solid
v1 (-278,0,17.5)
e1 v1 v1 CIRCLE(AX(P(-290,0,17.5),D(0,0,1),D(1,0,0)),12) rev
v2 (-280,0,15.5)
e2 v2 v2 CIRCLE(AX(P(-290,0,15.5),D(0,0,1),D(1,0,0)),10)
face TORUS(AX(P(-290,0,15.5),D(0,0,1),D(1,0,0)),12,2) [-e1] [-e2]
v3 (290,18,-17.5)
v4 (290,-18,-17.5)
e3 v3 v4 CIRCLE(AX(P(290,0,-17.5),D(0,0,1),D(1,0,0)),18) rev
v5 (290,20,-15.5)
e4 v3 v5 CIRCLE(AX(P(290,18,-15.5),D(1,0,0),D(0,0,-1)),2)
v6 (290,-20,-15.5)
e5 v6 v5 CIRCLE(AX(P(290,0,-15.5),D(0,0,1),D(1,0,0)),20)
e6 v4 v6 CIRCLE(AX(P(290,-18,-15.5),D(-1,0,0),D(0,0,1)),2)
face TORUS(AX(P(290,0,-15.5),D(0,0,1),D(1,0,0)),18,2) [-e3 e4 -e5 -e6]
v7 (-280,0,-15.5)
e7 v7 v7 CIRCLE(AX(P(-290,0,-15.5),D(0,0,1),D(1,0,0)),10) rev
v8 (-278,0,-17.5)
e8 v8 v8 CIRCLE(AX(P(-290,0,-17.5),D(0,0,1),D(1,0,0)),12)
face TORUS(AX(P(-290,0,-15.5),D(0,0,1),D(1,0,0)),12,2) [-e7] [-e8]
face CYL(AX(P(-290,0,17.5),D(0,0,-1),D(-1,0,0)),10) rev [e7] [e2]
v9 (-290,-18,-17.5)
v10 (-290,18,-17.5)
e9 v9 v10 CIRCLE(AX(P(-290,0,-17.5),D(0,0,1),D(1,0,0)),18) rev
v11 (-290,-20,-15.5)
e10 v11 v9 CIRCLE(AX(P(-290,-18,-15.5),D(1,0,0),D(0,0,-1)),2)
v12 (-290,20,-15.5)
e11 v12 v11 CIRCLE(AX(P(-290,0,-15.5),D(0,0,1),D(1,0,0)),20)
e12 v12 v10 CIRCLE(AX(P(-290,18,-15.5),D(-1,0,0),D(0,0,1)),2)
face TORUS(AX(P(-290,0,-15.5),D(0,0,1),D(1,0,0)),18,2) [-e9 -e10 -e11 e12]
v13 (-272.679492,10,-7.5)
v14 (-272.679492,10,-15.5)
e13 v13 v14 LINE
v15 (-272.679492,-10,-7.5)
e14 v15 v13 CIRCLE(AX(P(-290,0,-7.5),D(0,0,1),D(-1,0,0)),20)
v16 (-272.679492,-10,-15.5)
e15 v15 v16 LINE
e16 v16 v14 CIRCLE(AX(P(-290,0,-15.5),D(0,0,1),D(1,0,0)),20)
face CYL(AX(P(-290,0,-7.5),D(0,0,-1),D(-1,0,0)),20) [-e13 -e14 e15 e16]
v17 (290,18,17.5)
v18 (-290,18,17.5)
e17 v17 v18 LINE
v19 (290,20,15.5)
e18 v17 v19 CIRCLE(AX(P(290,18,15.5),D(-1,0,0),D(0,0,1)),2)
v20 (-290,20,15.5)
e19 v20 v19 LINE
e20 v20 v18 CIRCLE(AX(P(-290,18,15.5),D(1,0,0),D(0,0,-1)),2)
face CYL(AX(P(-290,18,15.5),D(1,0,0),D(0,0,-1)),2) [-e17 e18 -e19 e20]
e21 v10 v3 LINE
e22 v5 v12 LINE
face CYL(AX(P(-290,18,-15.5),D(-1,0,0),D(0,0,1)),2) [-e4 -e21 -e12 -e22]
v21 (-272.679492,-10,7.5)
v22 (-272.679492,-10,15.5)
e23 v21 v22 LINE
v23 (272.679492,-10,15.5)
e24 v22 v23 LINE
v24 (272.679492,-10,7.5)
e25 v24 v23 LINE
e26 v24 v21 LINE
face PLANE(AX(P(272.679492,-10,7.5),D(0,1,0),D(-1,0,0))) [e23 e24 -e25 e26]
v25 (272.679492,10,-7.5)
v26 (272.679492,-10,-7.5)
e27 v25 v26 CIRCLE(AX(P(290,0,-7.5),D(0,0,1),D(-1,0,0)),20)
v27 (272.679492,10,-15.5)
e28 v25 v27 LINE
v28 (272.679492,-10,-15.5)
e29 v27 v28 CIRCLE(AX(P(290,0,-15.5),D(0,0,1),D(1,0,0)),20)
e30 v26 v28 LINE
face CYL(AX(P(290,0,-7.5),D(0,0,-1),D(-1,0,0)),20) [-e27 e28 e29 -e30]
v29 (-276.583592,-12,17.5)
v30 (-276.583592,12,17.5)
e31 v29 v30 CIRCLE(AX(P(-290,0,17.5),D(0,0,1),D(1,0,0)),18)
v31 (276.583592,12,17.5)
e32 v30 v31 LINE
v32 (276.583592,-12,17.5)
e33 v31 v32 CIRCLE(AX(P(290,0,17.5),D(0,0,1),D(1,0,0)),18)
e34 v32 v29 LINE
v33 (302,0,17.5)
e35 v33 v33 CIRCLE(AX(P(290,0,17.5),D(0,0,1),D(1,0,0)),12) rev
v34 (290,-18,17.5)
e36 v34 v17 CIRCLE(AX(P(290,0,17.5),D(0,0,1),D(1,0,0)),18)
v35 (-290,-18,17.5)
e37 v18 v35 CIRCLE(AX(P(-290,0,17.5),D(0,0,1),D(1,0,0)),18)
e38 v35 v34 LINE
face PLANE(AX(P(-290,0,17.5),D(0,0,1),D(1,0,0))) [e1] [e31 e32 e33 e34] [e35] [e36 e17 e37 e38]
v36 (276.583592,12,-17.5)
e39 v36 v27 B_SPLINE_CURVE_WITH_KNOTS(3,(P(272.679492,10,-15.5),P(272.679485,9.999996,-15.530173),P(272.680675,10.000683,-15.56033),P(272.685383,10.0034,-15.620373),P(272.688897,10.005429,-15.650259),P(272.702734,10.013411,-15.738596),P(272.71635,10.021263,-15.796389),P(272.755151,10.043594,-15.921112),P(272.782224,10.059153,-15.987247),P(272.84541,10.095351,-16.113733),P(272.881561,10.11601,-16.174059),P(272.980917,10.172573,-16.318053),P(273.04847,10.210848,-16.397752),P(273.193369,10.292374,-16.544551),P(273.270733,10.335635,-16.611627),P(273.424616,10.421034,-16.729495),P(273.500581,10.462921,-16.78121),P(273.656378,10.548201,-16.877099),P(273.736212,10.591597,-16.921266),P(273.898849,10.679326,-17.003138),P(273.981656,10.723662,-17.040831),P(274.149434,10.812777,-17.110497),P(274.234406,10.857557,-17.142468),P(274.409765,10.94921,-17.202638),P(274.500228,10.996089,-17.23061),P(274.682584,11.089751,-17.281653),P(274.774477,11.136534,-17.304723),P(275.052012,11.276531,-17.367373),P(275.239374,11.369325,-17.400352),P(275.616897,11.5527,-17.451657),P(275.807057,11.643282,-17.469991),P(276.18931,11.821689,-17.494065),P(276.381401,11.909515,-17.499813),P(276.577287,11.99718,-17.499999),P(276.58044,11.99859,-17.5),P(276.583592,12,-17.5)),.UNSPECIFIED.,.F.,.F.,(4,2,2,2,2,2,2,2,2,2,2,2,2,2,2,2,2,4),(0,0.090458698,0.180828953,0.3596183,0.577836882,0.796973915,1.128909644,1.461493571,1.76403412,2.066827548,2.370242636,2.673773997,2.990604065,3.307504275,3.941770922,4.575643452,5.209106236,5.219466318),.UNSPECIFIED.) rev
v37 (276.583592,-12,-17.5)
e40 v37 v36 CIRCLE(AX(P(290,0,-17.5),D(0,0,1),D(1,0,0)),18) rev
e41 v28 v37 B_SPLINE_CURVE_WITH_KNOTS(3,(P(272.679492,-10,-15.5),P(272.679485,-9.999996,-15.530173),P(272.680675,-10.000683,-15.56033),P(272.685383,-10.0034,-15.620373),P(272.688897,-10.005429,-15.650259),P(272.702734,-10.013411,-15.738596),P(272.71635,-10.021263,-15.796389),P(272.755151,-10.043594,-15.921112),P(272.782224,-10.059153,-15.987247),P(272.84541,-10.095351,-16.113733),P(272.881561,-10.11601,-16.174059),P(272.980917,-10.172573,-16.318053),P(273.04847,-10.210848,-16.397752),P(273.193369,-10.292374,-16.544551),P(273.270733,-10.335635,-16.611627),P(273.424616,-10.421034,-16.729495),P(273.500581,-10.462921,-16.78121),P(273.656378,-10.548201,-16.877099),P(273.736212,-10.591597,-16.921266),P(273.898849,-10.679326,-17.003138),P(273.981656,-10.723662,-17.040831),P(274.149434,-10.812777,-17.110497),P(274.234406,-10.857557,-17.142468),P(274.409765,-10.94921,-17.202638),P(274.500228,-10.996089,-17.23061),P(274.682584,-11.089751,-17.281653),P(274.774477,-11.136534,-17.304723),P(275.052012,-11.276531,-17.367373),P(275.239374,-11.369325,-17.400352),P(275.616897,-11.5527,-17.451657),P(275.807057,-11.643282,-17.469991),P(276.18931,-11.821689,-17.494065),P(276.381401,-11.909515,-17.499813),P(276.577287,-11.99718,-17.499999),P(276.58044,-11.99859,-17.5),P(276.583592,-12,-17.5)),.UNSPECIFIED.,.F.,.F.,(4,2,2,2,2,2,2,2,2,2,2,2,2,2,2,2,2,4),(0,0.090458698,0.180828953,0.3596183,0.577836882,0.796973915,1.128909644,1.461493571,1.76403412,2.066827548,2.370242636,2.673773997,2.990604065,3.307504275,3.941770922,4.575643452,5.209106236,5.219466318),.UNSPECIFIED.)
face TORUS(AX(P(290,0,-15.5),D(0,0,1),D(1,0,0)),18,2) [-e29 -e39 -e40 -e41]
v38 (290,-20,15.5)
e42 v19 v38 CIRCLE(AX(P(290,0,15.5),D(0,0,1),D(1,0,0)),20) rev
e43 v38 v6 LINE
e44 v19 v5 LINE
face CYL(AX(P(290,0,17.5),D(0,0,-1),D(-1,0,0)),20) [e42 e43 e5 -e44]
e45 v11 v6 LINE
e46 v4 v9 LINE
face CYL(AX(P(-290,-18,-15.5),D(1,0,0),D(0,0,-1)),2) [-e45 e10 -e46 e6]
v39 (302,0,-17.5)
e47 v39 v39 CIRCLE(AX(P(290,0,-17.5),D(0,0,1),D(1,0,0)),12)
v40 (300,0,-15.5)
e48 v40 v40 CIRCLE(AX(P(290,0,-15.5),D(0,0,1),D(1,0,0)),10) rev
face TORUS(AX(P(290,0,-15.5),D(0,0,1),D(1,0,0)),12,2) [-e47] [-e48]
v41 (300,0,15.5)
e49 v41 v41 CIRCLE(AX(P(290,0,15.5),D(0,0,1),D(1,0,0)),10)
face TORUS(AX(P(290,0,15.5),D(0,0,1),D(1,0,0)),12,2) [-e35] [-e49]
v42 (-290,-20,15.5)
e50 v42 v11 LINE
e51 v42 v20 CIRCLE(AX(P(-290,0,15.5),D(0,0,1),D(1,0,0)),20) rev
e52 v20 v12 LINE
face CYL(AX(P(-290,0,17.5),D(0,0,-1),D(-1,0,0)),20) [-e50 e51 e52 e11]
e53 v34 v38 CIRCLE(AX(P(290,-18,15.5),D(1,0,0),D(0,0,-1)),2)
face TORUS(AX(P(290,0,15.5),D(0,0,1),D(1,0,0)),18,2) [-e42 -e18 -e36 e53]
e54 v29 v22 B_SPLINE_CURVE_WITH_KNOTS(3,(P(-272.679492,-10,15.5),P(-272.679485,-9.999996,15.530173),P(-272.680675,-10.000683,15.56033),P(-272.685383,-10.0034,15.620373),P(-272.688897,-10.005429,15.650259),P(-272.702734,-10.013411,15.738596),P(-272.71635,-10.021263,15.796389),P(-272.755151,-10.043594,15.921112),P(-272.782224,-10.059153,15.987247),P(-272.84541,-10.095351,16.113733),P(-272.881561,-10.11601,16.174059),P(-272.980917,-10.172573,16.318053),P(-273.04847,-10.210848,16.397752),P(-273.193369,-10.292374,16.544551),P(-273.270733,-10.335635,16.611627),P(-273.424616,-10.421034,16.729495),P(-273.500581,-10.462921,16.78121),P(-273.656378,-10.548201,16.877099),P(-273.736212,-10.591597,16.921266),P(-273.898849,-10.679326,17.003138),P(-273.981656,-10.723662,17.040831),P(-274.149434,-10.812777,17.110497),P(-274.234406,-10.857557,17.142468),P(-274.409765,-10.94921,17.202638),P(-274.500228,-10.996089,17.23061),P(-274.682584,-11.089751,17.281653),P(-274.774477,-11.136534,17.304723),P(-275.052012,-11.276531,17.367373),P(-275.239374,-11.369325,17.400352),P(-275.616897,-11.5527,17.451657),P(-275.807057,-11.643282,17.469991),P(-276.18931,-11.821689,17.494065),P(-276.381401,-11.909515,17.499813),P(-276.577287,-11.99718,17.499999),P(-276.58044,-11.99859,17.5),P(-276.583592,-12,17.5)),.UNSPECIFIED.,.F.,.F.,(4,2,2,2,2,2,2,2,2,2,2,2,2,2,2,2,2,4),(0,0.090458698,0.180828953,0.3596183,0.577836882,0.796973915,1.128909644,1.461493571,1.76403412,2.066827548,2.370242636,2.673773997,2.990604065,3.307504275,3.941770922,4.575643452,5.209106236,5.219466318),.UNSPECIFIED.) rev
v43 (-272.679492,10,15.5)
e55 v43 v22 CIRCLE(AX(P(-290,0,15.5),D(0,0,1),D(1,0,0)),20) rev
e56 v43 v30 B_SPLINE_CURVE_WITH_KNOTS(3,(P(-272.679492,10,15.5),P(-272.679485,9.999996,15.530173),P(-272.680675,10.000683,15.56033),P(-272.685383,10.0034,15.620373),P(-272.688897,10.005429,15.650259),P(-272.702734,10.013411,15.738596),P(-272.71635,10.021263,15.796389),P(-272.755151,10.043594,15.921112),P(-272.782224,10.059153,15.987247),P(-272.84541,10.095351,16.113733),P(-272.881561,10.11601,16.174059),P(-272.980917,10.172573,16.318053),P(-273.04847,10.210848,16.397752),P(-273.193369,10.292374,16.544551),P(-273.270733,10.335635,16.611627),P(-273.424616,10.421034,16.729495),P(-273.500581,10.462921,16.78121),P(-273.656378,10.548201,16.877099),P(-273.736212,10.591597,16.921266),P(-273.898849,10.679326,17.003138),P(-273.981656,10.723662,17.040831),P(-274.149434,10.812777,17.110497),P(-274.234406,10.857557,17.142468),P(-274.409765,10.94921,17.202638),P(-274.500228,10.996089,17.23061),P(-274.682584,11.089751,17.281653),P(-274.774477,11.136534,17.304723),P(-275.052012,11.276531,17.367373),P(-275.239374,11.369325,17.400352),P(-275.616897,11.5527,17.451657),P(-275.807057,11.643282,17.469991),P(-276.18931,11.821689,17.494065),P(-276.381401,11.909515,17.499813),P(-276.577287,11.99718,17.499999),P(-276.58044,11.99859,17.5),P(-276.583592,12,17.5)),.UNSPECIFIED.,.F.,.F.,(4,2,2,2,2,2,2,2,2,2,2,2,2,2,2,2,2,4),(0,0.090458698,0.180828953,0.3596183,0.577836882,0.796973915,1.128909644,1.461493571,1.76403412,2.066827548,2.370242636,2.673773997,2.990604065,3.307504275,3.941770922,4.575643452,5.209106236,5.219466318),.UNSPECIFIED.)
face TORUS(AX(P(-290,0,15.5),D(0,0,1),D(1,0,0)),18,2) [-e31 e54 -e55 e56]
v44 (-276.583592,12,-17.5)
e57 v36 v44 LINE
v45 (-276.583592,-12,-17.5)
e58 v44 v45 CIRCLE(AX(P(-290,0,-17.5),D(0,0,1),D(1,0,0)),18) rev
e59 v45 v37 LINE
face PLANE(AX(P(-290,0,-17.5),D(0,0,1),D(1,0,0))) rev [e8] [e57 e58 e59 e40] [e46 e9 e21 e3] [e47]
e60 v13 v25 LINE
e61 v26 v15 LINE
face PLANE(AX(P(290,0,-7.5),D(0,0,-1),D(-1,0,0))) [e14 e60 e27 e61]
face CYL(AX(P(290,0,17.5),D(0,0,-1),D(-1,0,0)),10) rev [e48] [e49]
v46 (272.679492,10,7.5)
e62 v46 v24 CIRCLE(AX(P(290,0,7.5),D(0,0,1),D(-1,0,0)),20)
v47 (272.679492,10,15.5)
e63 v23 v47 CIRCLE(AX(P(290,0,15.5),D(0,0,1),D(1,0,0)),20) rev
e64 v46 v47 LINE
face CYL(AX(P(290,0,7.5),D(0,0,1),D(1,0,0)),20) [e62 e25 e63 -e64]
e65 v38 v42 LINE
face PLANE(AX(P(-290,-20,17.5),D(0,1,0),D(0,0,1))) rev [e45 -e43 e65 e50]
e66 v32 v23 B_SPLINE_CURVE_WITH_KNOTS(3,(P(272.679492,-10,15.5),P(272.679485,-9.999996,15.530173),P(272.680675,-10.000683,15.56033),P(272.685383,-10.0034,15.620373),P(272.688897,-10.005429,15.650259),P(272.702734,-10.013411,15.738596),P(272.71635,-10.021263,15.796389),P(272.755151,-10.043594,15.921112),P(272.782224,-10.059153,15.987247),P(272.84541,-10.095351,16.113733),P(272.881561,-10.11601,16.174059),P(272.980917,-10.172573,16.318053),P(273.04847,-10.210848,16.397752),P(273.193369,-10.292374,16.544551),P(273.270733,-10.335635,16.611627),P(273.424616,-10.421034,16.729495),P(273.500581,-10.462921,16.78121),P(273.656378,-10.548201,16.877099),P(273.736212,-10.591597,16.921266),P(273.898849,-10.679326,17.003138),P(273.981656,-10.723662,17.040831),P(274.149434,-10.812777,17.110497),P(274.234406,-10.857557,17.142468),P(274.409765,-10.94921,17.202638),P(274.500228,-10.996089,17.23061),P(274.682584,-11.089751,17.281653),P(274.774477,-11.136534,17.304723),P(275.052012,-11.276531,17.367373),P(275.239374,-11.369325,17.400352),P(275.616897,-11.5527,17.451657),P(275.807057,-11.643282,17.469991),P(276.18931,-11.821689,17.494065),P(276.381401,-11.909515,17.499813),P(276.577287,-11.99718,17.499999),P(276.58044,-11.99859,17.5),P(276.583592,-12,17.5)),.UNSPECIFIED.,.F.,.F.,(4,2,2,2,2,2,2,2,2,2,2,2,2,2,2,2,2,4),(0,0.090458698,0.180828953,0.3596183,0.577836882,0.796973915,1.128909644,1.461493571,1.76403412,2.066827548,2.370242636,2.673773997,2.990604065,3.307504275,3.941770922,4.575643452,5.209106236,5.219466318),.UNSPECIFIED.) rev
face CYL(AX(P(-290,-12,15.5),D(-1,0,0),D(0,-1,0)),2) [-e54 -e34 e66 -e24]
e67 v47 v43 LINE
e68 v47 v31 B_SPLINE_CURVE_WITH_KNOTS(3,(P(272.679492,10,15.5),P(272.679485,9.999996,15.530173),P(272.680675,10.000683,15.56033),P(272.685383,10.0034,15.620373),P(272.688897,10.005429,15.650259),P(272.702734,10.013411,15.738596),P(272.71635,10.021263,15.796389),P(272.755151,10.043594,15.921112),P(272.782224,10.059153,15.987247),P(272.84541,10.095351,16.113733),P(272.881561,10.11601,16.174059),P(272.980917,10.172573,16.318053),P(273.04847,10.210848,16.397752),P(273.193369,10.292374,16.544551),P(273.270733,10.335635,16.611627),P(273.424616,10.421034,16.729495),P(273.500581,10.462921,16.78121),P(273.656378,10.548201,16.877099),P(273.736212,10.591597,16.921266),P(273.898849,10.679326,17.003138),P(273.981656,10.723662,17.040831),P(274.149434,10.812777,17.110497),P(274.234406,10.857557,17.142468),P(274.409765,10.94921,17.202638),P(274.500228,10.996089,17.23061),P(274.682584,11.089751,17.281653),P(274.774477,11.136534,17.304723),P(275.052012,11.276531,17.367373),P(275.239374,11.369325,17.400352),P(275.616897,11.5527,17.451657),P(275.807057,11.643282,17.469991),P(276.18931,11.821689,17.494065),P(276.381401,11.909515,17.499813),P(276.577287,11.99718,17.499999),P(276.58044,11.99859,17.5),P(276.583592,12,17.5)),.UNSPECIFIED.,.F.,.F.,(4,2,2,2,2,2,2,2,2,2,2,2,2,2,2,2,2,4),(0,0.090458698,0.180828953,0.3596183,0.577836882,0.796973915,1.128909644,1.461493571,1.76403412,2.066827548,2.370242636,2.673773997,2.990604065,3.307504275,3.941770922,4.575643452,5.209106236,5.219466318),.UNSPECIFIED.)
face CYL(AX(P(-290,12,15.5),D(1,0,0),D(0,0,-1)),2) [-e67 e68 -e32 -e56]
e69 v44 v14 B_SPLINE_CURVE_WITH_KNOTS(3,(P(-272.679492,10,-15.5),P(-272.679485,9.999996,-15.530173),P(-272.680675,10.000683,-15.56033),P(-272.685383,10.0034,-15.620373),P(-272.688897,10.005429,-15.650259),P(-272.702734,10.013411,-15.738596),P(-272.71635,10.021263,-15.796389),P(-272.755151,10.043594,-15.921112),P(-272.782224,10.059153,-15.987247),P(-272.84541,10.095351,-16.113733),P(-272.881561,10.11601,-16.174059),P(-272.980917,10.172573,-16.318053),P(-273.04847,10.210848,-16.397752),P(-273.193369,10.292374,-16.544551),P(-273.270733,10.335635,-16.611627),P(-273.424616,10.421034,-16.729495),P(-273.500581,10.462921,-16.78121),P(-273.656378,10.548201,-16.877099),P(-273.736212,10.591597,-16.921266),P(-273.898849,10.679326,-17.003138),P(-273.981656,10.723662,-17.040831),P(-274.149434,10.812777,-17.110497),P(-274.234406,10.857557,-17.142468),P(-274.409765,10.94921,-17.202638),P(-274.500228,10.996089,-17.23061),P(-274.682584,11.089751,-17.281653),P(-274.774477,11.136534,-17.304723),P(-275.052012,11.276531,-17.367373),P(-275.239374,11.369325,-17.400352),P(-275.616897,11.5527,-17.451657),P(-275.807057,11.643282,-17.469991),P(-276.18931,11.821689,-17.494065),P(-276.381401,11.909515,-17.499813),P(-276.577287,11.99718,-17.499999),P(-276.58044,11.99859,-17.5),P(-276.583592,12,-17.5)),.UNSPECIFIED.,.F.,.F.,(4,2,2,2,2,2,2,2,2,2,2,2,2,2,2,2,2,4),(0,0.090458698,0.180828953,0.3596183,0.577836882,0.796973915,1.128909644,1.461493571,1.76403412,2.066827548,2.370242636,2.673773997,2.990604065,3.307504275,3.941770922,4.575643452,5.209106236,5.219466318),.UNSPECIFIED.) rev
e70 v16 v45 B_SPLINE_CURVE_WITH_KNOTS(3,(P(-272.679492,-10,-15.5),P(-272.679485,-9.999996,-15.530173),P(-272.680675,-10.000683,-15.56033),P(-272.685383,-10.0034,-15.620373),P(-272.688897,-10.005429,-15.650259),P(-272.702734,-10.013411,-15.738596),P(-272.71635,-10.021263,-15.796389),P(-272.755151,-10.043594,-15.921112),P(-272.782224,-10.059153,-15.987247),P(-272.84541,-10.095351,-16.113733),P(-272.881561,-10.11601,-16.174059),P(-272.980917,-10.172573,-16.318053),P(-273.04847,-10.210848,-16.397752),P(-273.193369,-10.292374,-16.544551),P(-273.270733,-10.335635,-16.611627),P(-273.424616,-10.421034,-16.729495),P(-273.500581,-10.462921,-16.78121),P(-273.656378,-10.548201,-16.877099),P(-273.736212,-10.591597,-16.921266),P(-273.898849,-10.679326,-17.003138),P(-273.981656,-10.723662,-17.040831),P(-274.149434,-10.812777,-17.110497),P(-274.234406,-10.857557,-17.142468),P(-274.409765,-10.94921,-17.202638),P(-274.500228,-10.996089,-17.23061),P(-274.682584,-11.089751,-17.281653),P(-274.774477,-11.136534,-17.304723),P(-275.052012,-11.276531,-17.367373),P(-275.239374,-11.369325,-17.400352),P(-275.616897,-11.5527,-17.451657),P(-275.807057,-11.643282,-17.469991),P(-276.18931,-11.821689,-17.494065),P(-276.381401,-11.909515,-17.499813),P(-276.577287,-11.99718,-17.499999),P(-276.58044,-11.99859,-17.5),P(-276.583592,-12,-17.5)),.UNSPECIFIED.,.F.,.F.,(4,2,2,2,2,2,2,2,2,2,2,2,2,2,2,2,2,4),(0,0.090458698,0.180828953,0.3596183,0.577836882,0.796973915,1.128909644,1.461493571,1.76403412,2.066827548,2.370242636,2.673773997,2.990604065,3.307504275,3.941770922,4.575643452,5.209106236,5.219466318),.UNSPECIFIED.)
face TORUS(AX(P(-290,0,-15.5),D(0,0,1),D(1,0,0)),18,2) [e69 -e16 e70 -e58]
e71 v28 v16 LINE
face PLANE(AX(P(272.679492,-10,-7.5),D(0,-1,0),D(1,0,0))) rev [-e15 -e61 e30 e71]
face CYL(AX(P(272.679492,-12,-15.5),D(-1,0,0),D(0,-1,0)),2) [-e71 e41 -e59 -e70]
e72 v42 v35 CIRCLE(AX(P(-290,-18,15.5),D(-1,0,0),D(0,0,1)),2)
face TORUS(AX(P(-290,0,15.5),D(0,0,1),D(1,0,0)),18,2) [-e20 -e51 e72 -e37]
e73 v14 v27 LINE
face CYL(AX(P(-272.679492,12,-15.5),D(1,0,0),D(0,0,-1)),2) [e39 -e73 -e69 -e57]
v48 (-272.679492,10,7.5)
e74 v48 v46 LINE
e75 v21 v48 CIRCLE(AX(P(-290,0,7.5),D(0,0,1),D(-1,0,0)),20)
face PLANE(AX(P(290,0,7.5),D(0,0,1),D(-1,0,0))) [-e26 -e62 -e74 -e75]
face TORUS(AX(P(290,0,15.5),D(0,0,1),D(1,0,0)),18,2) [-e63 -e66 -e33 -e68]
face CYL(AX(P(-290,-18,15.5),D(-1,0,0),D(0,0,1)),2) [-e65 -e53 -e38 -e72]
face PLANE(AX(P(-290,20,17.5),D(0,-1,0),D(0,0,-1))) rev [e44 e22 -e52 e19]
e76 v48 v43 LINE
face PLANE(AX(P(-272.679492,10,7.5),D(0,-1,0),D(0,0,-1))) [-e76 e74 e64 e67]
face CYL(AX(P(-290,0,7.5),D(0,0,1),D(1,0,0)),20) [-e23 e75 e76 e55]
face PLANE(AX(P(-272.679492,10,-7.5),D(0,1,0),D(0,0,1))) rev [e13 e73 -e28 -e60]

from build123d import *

# Parameters (mm, degrees)
SKETCH2_R           = 10
BOSS_EXTRUDE1_DEPTH = 17.5
CUT_EXTRUDE1_START  = -10
CUT_EXTRUDE1_DEPTH  = 10
FILLET4_R           = 2


with BuildPart() as part:
    # Sketch2 → Boss-Extrude1 (new, symmetric)
    with BuildSketch(Plane.XY):
        with BuildLine():
            Line((-290, 20), (290, 20))
            ThreePointArc((290, 20), (310, 0), (290, -20))
            Line((290, -20), (-290, -20))
            ThreePointArc((-290, -20), (-310, 0), (-290, 20))
        make_face()
        with Locations((-290, 0)):
            Circle(SKETCH2_R, mode=Mode.SUBTRACT)
        with Locations((290, 0)):
            Circle(SKETCH2_R, mode=Mode.SUBTRACT)
    extrude(amount=BOSS_EXTRUDE1_DEPTH, both=True)

    # Sketch4 → Cut-Extrude1 (cut)
    with BuildSketch(Plane(origin=(0, 0, -17.5), x_dir=(-1, 0, 0), z_dir=(0, 0, -1)).offset(CUT_EXTRUDE1_START)):
        with BuildLine():
            Line((272.679491924, 10), (-272.679491924, 10))
            ThreePointArc((-272.679491924, 10), (-270, 0), (-272.679491924, -10))
            Line((-272.679491924, -10), (272.679491924, -10))
            ThreePointArc((272.679491924, -10), (270, 0), (272.679491924, 10))
        make_face()
    cut_extrude1 = extrude(amount=CUT_EXTRUDE1_DEPTH, mode=Mode.SUBTRACT)

    # Mirror1: Cut-Extrude1 across plane
    add(cut_extrude1.mirror(Plane.XY), mode=Mode.SUBTRACT)

    # Fillet4
    fillet4_edges = [part.edges().sort_by_distance(p)[0] for p in [
        (0, 20, -17.5),
        (-310, 0, -17.5),
        (310, 0, -17.5),
        (0, -20, -17.5),
    ]]
    fillet(fillet4_edges, radius=FILLET4_R)
    fillet4_2_edges = [part.edges().sort_by_distance(p)[0] for p in [
        (0, 20, 17.5),
        (-310, 0, 17.5),
        (310, 0, 17.5),
        (0, -20, 17.5),
    ]]
    fillet(fillet4_2_edges, radius=FILLET4_R)
    fillet4_3_edges = [part.edges().sort_by_distance(p)[0] for p in [
        (280, 0, -17.5),
    ]]
    fillet(fillet4_3_edges, radius=FILLET4_R)
    fillet4_4_edges = [part.edges().sort_by_distance(p)[0] for p in [
        (0, 10, -17.5),
        (270, 0, -17.5),
        (0, -10, -17.5),
        (-270, 0, -17.5),
    ]]
    fillet(fillet4_4_edges, radius=FILLET4_R)
    fillet4_5_edges = [part.edges().sort_by_distance(p)[0] for p in [
        (-300, 0, -17.5),
    ]]
    fillet(fillet4_5_edges, radius=FILLET4_R)
    fillet4_6_edges = [part.edges().sort_by_distance(p)[0] for p in [
        (280, 0, 17.5),
    ]]
    fillet(fillet4_6_edges, radius=FILLET4_R)
    fillet4_7_edges = [part.edges().sort_by_distance(p)[0] for p in [
        (0, 10, 17.5),
        (270, 0, 17.5),
        (0, -10, 17.5),
        (-270, 0, 17.5),
    ]]
    fillet(fillet4_7_edges, radius=FILLET4_R)
    fillet4_8_edges = [part.edges().sort_by_distance(p)[0] for p in [
        (-300, 0, 17.5),
    ]]
    fillet(fillet4_8_edges, radius=FILLET4_R)


solid = part.part
